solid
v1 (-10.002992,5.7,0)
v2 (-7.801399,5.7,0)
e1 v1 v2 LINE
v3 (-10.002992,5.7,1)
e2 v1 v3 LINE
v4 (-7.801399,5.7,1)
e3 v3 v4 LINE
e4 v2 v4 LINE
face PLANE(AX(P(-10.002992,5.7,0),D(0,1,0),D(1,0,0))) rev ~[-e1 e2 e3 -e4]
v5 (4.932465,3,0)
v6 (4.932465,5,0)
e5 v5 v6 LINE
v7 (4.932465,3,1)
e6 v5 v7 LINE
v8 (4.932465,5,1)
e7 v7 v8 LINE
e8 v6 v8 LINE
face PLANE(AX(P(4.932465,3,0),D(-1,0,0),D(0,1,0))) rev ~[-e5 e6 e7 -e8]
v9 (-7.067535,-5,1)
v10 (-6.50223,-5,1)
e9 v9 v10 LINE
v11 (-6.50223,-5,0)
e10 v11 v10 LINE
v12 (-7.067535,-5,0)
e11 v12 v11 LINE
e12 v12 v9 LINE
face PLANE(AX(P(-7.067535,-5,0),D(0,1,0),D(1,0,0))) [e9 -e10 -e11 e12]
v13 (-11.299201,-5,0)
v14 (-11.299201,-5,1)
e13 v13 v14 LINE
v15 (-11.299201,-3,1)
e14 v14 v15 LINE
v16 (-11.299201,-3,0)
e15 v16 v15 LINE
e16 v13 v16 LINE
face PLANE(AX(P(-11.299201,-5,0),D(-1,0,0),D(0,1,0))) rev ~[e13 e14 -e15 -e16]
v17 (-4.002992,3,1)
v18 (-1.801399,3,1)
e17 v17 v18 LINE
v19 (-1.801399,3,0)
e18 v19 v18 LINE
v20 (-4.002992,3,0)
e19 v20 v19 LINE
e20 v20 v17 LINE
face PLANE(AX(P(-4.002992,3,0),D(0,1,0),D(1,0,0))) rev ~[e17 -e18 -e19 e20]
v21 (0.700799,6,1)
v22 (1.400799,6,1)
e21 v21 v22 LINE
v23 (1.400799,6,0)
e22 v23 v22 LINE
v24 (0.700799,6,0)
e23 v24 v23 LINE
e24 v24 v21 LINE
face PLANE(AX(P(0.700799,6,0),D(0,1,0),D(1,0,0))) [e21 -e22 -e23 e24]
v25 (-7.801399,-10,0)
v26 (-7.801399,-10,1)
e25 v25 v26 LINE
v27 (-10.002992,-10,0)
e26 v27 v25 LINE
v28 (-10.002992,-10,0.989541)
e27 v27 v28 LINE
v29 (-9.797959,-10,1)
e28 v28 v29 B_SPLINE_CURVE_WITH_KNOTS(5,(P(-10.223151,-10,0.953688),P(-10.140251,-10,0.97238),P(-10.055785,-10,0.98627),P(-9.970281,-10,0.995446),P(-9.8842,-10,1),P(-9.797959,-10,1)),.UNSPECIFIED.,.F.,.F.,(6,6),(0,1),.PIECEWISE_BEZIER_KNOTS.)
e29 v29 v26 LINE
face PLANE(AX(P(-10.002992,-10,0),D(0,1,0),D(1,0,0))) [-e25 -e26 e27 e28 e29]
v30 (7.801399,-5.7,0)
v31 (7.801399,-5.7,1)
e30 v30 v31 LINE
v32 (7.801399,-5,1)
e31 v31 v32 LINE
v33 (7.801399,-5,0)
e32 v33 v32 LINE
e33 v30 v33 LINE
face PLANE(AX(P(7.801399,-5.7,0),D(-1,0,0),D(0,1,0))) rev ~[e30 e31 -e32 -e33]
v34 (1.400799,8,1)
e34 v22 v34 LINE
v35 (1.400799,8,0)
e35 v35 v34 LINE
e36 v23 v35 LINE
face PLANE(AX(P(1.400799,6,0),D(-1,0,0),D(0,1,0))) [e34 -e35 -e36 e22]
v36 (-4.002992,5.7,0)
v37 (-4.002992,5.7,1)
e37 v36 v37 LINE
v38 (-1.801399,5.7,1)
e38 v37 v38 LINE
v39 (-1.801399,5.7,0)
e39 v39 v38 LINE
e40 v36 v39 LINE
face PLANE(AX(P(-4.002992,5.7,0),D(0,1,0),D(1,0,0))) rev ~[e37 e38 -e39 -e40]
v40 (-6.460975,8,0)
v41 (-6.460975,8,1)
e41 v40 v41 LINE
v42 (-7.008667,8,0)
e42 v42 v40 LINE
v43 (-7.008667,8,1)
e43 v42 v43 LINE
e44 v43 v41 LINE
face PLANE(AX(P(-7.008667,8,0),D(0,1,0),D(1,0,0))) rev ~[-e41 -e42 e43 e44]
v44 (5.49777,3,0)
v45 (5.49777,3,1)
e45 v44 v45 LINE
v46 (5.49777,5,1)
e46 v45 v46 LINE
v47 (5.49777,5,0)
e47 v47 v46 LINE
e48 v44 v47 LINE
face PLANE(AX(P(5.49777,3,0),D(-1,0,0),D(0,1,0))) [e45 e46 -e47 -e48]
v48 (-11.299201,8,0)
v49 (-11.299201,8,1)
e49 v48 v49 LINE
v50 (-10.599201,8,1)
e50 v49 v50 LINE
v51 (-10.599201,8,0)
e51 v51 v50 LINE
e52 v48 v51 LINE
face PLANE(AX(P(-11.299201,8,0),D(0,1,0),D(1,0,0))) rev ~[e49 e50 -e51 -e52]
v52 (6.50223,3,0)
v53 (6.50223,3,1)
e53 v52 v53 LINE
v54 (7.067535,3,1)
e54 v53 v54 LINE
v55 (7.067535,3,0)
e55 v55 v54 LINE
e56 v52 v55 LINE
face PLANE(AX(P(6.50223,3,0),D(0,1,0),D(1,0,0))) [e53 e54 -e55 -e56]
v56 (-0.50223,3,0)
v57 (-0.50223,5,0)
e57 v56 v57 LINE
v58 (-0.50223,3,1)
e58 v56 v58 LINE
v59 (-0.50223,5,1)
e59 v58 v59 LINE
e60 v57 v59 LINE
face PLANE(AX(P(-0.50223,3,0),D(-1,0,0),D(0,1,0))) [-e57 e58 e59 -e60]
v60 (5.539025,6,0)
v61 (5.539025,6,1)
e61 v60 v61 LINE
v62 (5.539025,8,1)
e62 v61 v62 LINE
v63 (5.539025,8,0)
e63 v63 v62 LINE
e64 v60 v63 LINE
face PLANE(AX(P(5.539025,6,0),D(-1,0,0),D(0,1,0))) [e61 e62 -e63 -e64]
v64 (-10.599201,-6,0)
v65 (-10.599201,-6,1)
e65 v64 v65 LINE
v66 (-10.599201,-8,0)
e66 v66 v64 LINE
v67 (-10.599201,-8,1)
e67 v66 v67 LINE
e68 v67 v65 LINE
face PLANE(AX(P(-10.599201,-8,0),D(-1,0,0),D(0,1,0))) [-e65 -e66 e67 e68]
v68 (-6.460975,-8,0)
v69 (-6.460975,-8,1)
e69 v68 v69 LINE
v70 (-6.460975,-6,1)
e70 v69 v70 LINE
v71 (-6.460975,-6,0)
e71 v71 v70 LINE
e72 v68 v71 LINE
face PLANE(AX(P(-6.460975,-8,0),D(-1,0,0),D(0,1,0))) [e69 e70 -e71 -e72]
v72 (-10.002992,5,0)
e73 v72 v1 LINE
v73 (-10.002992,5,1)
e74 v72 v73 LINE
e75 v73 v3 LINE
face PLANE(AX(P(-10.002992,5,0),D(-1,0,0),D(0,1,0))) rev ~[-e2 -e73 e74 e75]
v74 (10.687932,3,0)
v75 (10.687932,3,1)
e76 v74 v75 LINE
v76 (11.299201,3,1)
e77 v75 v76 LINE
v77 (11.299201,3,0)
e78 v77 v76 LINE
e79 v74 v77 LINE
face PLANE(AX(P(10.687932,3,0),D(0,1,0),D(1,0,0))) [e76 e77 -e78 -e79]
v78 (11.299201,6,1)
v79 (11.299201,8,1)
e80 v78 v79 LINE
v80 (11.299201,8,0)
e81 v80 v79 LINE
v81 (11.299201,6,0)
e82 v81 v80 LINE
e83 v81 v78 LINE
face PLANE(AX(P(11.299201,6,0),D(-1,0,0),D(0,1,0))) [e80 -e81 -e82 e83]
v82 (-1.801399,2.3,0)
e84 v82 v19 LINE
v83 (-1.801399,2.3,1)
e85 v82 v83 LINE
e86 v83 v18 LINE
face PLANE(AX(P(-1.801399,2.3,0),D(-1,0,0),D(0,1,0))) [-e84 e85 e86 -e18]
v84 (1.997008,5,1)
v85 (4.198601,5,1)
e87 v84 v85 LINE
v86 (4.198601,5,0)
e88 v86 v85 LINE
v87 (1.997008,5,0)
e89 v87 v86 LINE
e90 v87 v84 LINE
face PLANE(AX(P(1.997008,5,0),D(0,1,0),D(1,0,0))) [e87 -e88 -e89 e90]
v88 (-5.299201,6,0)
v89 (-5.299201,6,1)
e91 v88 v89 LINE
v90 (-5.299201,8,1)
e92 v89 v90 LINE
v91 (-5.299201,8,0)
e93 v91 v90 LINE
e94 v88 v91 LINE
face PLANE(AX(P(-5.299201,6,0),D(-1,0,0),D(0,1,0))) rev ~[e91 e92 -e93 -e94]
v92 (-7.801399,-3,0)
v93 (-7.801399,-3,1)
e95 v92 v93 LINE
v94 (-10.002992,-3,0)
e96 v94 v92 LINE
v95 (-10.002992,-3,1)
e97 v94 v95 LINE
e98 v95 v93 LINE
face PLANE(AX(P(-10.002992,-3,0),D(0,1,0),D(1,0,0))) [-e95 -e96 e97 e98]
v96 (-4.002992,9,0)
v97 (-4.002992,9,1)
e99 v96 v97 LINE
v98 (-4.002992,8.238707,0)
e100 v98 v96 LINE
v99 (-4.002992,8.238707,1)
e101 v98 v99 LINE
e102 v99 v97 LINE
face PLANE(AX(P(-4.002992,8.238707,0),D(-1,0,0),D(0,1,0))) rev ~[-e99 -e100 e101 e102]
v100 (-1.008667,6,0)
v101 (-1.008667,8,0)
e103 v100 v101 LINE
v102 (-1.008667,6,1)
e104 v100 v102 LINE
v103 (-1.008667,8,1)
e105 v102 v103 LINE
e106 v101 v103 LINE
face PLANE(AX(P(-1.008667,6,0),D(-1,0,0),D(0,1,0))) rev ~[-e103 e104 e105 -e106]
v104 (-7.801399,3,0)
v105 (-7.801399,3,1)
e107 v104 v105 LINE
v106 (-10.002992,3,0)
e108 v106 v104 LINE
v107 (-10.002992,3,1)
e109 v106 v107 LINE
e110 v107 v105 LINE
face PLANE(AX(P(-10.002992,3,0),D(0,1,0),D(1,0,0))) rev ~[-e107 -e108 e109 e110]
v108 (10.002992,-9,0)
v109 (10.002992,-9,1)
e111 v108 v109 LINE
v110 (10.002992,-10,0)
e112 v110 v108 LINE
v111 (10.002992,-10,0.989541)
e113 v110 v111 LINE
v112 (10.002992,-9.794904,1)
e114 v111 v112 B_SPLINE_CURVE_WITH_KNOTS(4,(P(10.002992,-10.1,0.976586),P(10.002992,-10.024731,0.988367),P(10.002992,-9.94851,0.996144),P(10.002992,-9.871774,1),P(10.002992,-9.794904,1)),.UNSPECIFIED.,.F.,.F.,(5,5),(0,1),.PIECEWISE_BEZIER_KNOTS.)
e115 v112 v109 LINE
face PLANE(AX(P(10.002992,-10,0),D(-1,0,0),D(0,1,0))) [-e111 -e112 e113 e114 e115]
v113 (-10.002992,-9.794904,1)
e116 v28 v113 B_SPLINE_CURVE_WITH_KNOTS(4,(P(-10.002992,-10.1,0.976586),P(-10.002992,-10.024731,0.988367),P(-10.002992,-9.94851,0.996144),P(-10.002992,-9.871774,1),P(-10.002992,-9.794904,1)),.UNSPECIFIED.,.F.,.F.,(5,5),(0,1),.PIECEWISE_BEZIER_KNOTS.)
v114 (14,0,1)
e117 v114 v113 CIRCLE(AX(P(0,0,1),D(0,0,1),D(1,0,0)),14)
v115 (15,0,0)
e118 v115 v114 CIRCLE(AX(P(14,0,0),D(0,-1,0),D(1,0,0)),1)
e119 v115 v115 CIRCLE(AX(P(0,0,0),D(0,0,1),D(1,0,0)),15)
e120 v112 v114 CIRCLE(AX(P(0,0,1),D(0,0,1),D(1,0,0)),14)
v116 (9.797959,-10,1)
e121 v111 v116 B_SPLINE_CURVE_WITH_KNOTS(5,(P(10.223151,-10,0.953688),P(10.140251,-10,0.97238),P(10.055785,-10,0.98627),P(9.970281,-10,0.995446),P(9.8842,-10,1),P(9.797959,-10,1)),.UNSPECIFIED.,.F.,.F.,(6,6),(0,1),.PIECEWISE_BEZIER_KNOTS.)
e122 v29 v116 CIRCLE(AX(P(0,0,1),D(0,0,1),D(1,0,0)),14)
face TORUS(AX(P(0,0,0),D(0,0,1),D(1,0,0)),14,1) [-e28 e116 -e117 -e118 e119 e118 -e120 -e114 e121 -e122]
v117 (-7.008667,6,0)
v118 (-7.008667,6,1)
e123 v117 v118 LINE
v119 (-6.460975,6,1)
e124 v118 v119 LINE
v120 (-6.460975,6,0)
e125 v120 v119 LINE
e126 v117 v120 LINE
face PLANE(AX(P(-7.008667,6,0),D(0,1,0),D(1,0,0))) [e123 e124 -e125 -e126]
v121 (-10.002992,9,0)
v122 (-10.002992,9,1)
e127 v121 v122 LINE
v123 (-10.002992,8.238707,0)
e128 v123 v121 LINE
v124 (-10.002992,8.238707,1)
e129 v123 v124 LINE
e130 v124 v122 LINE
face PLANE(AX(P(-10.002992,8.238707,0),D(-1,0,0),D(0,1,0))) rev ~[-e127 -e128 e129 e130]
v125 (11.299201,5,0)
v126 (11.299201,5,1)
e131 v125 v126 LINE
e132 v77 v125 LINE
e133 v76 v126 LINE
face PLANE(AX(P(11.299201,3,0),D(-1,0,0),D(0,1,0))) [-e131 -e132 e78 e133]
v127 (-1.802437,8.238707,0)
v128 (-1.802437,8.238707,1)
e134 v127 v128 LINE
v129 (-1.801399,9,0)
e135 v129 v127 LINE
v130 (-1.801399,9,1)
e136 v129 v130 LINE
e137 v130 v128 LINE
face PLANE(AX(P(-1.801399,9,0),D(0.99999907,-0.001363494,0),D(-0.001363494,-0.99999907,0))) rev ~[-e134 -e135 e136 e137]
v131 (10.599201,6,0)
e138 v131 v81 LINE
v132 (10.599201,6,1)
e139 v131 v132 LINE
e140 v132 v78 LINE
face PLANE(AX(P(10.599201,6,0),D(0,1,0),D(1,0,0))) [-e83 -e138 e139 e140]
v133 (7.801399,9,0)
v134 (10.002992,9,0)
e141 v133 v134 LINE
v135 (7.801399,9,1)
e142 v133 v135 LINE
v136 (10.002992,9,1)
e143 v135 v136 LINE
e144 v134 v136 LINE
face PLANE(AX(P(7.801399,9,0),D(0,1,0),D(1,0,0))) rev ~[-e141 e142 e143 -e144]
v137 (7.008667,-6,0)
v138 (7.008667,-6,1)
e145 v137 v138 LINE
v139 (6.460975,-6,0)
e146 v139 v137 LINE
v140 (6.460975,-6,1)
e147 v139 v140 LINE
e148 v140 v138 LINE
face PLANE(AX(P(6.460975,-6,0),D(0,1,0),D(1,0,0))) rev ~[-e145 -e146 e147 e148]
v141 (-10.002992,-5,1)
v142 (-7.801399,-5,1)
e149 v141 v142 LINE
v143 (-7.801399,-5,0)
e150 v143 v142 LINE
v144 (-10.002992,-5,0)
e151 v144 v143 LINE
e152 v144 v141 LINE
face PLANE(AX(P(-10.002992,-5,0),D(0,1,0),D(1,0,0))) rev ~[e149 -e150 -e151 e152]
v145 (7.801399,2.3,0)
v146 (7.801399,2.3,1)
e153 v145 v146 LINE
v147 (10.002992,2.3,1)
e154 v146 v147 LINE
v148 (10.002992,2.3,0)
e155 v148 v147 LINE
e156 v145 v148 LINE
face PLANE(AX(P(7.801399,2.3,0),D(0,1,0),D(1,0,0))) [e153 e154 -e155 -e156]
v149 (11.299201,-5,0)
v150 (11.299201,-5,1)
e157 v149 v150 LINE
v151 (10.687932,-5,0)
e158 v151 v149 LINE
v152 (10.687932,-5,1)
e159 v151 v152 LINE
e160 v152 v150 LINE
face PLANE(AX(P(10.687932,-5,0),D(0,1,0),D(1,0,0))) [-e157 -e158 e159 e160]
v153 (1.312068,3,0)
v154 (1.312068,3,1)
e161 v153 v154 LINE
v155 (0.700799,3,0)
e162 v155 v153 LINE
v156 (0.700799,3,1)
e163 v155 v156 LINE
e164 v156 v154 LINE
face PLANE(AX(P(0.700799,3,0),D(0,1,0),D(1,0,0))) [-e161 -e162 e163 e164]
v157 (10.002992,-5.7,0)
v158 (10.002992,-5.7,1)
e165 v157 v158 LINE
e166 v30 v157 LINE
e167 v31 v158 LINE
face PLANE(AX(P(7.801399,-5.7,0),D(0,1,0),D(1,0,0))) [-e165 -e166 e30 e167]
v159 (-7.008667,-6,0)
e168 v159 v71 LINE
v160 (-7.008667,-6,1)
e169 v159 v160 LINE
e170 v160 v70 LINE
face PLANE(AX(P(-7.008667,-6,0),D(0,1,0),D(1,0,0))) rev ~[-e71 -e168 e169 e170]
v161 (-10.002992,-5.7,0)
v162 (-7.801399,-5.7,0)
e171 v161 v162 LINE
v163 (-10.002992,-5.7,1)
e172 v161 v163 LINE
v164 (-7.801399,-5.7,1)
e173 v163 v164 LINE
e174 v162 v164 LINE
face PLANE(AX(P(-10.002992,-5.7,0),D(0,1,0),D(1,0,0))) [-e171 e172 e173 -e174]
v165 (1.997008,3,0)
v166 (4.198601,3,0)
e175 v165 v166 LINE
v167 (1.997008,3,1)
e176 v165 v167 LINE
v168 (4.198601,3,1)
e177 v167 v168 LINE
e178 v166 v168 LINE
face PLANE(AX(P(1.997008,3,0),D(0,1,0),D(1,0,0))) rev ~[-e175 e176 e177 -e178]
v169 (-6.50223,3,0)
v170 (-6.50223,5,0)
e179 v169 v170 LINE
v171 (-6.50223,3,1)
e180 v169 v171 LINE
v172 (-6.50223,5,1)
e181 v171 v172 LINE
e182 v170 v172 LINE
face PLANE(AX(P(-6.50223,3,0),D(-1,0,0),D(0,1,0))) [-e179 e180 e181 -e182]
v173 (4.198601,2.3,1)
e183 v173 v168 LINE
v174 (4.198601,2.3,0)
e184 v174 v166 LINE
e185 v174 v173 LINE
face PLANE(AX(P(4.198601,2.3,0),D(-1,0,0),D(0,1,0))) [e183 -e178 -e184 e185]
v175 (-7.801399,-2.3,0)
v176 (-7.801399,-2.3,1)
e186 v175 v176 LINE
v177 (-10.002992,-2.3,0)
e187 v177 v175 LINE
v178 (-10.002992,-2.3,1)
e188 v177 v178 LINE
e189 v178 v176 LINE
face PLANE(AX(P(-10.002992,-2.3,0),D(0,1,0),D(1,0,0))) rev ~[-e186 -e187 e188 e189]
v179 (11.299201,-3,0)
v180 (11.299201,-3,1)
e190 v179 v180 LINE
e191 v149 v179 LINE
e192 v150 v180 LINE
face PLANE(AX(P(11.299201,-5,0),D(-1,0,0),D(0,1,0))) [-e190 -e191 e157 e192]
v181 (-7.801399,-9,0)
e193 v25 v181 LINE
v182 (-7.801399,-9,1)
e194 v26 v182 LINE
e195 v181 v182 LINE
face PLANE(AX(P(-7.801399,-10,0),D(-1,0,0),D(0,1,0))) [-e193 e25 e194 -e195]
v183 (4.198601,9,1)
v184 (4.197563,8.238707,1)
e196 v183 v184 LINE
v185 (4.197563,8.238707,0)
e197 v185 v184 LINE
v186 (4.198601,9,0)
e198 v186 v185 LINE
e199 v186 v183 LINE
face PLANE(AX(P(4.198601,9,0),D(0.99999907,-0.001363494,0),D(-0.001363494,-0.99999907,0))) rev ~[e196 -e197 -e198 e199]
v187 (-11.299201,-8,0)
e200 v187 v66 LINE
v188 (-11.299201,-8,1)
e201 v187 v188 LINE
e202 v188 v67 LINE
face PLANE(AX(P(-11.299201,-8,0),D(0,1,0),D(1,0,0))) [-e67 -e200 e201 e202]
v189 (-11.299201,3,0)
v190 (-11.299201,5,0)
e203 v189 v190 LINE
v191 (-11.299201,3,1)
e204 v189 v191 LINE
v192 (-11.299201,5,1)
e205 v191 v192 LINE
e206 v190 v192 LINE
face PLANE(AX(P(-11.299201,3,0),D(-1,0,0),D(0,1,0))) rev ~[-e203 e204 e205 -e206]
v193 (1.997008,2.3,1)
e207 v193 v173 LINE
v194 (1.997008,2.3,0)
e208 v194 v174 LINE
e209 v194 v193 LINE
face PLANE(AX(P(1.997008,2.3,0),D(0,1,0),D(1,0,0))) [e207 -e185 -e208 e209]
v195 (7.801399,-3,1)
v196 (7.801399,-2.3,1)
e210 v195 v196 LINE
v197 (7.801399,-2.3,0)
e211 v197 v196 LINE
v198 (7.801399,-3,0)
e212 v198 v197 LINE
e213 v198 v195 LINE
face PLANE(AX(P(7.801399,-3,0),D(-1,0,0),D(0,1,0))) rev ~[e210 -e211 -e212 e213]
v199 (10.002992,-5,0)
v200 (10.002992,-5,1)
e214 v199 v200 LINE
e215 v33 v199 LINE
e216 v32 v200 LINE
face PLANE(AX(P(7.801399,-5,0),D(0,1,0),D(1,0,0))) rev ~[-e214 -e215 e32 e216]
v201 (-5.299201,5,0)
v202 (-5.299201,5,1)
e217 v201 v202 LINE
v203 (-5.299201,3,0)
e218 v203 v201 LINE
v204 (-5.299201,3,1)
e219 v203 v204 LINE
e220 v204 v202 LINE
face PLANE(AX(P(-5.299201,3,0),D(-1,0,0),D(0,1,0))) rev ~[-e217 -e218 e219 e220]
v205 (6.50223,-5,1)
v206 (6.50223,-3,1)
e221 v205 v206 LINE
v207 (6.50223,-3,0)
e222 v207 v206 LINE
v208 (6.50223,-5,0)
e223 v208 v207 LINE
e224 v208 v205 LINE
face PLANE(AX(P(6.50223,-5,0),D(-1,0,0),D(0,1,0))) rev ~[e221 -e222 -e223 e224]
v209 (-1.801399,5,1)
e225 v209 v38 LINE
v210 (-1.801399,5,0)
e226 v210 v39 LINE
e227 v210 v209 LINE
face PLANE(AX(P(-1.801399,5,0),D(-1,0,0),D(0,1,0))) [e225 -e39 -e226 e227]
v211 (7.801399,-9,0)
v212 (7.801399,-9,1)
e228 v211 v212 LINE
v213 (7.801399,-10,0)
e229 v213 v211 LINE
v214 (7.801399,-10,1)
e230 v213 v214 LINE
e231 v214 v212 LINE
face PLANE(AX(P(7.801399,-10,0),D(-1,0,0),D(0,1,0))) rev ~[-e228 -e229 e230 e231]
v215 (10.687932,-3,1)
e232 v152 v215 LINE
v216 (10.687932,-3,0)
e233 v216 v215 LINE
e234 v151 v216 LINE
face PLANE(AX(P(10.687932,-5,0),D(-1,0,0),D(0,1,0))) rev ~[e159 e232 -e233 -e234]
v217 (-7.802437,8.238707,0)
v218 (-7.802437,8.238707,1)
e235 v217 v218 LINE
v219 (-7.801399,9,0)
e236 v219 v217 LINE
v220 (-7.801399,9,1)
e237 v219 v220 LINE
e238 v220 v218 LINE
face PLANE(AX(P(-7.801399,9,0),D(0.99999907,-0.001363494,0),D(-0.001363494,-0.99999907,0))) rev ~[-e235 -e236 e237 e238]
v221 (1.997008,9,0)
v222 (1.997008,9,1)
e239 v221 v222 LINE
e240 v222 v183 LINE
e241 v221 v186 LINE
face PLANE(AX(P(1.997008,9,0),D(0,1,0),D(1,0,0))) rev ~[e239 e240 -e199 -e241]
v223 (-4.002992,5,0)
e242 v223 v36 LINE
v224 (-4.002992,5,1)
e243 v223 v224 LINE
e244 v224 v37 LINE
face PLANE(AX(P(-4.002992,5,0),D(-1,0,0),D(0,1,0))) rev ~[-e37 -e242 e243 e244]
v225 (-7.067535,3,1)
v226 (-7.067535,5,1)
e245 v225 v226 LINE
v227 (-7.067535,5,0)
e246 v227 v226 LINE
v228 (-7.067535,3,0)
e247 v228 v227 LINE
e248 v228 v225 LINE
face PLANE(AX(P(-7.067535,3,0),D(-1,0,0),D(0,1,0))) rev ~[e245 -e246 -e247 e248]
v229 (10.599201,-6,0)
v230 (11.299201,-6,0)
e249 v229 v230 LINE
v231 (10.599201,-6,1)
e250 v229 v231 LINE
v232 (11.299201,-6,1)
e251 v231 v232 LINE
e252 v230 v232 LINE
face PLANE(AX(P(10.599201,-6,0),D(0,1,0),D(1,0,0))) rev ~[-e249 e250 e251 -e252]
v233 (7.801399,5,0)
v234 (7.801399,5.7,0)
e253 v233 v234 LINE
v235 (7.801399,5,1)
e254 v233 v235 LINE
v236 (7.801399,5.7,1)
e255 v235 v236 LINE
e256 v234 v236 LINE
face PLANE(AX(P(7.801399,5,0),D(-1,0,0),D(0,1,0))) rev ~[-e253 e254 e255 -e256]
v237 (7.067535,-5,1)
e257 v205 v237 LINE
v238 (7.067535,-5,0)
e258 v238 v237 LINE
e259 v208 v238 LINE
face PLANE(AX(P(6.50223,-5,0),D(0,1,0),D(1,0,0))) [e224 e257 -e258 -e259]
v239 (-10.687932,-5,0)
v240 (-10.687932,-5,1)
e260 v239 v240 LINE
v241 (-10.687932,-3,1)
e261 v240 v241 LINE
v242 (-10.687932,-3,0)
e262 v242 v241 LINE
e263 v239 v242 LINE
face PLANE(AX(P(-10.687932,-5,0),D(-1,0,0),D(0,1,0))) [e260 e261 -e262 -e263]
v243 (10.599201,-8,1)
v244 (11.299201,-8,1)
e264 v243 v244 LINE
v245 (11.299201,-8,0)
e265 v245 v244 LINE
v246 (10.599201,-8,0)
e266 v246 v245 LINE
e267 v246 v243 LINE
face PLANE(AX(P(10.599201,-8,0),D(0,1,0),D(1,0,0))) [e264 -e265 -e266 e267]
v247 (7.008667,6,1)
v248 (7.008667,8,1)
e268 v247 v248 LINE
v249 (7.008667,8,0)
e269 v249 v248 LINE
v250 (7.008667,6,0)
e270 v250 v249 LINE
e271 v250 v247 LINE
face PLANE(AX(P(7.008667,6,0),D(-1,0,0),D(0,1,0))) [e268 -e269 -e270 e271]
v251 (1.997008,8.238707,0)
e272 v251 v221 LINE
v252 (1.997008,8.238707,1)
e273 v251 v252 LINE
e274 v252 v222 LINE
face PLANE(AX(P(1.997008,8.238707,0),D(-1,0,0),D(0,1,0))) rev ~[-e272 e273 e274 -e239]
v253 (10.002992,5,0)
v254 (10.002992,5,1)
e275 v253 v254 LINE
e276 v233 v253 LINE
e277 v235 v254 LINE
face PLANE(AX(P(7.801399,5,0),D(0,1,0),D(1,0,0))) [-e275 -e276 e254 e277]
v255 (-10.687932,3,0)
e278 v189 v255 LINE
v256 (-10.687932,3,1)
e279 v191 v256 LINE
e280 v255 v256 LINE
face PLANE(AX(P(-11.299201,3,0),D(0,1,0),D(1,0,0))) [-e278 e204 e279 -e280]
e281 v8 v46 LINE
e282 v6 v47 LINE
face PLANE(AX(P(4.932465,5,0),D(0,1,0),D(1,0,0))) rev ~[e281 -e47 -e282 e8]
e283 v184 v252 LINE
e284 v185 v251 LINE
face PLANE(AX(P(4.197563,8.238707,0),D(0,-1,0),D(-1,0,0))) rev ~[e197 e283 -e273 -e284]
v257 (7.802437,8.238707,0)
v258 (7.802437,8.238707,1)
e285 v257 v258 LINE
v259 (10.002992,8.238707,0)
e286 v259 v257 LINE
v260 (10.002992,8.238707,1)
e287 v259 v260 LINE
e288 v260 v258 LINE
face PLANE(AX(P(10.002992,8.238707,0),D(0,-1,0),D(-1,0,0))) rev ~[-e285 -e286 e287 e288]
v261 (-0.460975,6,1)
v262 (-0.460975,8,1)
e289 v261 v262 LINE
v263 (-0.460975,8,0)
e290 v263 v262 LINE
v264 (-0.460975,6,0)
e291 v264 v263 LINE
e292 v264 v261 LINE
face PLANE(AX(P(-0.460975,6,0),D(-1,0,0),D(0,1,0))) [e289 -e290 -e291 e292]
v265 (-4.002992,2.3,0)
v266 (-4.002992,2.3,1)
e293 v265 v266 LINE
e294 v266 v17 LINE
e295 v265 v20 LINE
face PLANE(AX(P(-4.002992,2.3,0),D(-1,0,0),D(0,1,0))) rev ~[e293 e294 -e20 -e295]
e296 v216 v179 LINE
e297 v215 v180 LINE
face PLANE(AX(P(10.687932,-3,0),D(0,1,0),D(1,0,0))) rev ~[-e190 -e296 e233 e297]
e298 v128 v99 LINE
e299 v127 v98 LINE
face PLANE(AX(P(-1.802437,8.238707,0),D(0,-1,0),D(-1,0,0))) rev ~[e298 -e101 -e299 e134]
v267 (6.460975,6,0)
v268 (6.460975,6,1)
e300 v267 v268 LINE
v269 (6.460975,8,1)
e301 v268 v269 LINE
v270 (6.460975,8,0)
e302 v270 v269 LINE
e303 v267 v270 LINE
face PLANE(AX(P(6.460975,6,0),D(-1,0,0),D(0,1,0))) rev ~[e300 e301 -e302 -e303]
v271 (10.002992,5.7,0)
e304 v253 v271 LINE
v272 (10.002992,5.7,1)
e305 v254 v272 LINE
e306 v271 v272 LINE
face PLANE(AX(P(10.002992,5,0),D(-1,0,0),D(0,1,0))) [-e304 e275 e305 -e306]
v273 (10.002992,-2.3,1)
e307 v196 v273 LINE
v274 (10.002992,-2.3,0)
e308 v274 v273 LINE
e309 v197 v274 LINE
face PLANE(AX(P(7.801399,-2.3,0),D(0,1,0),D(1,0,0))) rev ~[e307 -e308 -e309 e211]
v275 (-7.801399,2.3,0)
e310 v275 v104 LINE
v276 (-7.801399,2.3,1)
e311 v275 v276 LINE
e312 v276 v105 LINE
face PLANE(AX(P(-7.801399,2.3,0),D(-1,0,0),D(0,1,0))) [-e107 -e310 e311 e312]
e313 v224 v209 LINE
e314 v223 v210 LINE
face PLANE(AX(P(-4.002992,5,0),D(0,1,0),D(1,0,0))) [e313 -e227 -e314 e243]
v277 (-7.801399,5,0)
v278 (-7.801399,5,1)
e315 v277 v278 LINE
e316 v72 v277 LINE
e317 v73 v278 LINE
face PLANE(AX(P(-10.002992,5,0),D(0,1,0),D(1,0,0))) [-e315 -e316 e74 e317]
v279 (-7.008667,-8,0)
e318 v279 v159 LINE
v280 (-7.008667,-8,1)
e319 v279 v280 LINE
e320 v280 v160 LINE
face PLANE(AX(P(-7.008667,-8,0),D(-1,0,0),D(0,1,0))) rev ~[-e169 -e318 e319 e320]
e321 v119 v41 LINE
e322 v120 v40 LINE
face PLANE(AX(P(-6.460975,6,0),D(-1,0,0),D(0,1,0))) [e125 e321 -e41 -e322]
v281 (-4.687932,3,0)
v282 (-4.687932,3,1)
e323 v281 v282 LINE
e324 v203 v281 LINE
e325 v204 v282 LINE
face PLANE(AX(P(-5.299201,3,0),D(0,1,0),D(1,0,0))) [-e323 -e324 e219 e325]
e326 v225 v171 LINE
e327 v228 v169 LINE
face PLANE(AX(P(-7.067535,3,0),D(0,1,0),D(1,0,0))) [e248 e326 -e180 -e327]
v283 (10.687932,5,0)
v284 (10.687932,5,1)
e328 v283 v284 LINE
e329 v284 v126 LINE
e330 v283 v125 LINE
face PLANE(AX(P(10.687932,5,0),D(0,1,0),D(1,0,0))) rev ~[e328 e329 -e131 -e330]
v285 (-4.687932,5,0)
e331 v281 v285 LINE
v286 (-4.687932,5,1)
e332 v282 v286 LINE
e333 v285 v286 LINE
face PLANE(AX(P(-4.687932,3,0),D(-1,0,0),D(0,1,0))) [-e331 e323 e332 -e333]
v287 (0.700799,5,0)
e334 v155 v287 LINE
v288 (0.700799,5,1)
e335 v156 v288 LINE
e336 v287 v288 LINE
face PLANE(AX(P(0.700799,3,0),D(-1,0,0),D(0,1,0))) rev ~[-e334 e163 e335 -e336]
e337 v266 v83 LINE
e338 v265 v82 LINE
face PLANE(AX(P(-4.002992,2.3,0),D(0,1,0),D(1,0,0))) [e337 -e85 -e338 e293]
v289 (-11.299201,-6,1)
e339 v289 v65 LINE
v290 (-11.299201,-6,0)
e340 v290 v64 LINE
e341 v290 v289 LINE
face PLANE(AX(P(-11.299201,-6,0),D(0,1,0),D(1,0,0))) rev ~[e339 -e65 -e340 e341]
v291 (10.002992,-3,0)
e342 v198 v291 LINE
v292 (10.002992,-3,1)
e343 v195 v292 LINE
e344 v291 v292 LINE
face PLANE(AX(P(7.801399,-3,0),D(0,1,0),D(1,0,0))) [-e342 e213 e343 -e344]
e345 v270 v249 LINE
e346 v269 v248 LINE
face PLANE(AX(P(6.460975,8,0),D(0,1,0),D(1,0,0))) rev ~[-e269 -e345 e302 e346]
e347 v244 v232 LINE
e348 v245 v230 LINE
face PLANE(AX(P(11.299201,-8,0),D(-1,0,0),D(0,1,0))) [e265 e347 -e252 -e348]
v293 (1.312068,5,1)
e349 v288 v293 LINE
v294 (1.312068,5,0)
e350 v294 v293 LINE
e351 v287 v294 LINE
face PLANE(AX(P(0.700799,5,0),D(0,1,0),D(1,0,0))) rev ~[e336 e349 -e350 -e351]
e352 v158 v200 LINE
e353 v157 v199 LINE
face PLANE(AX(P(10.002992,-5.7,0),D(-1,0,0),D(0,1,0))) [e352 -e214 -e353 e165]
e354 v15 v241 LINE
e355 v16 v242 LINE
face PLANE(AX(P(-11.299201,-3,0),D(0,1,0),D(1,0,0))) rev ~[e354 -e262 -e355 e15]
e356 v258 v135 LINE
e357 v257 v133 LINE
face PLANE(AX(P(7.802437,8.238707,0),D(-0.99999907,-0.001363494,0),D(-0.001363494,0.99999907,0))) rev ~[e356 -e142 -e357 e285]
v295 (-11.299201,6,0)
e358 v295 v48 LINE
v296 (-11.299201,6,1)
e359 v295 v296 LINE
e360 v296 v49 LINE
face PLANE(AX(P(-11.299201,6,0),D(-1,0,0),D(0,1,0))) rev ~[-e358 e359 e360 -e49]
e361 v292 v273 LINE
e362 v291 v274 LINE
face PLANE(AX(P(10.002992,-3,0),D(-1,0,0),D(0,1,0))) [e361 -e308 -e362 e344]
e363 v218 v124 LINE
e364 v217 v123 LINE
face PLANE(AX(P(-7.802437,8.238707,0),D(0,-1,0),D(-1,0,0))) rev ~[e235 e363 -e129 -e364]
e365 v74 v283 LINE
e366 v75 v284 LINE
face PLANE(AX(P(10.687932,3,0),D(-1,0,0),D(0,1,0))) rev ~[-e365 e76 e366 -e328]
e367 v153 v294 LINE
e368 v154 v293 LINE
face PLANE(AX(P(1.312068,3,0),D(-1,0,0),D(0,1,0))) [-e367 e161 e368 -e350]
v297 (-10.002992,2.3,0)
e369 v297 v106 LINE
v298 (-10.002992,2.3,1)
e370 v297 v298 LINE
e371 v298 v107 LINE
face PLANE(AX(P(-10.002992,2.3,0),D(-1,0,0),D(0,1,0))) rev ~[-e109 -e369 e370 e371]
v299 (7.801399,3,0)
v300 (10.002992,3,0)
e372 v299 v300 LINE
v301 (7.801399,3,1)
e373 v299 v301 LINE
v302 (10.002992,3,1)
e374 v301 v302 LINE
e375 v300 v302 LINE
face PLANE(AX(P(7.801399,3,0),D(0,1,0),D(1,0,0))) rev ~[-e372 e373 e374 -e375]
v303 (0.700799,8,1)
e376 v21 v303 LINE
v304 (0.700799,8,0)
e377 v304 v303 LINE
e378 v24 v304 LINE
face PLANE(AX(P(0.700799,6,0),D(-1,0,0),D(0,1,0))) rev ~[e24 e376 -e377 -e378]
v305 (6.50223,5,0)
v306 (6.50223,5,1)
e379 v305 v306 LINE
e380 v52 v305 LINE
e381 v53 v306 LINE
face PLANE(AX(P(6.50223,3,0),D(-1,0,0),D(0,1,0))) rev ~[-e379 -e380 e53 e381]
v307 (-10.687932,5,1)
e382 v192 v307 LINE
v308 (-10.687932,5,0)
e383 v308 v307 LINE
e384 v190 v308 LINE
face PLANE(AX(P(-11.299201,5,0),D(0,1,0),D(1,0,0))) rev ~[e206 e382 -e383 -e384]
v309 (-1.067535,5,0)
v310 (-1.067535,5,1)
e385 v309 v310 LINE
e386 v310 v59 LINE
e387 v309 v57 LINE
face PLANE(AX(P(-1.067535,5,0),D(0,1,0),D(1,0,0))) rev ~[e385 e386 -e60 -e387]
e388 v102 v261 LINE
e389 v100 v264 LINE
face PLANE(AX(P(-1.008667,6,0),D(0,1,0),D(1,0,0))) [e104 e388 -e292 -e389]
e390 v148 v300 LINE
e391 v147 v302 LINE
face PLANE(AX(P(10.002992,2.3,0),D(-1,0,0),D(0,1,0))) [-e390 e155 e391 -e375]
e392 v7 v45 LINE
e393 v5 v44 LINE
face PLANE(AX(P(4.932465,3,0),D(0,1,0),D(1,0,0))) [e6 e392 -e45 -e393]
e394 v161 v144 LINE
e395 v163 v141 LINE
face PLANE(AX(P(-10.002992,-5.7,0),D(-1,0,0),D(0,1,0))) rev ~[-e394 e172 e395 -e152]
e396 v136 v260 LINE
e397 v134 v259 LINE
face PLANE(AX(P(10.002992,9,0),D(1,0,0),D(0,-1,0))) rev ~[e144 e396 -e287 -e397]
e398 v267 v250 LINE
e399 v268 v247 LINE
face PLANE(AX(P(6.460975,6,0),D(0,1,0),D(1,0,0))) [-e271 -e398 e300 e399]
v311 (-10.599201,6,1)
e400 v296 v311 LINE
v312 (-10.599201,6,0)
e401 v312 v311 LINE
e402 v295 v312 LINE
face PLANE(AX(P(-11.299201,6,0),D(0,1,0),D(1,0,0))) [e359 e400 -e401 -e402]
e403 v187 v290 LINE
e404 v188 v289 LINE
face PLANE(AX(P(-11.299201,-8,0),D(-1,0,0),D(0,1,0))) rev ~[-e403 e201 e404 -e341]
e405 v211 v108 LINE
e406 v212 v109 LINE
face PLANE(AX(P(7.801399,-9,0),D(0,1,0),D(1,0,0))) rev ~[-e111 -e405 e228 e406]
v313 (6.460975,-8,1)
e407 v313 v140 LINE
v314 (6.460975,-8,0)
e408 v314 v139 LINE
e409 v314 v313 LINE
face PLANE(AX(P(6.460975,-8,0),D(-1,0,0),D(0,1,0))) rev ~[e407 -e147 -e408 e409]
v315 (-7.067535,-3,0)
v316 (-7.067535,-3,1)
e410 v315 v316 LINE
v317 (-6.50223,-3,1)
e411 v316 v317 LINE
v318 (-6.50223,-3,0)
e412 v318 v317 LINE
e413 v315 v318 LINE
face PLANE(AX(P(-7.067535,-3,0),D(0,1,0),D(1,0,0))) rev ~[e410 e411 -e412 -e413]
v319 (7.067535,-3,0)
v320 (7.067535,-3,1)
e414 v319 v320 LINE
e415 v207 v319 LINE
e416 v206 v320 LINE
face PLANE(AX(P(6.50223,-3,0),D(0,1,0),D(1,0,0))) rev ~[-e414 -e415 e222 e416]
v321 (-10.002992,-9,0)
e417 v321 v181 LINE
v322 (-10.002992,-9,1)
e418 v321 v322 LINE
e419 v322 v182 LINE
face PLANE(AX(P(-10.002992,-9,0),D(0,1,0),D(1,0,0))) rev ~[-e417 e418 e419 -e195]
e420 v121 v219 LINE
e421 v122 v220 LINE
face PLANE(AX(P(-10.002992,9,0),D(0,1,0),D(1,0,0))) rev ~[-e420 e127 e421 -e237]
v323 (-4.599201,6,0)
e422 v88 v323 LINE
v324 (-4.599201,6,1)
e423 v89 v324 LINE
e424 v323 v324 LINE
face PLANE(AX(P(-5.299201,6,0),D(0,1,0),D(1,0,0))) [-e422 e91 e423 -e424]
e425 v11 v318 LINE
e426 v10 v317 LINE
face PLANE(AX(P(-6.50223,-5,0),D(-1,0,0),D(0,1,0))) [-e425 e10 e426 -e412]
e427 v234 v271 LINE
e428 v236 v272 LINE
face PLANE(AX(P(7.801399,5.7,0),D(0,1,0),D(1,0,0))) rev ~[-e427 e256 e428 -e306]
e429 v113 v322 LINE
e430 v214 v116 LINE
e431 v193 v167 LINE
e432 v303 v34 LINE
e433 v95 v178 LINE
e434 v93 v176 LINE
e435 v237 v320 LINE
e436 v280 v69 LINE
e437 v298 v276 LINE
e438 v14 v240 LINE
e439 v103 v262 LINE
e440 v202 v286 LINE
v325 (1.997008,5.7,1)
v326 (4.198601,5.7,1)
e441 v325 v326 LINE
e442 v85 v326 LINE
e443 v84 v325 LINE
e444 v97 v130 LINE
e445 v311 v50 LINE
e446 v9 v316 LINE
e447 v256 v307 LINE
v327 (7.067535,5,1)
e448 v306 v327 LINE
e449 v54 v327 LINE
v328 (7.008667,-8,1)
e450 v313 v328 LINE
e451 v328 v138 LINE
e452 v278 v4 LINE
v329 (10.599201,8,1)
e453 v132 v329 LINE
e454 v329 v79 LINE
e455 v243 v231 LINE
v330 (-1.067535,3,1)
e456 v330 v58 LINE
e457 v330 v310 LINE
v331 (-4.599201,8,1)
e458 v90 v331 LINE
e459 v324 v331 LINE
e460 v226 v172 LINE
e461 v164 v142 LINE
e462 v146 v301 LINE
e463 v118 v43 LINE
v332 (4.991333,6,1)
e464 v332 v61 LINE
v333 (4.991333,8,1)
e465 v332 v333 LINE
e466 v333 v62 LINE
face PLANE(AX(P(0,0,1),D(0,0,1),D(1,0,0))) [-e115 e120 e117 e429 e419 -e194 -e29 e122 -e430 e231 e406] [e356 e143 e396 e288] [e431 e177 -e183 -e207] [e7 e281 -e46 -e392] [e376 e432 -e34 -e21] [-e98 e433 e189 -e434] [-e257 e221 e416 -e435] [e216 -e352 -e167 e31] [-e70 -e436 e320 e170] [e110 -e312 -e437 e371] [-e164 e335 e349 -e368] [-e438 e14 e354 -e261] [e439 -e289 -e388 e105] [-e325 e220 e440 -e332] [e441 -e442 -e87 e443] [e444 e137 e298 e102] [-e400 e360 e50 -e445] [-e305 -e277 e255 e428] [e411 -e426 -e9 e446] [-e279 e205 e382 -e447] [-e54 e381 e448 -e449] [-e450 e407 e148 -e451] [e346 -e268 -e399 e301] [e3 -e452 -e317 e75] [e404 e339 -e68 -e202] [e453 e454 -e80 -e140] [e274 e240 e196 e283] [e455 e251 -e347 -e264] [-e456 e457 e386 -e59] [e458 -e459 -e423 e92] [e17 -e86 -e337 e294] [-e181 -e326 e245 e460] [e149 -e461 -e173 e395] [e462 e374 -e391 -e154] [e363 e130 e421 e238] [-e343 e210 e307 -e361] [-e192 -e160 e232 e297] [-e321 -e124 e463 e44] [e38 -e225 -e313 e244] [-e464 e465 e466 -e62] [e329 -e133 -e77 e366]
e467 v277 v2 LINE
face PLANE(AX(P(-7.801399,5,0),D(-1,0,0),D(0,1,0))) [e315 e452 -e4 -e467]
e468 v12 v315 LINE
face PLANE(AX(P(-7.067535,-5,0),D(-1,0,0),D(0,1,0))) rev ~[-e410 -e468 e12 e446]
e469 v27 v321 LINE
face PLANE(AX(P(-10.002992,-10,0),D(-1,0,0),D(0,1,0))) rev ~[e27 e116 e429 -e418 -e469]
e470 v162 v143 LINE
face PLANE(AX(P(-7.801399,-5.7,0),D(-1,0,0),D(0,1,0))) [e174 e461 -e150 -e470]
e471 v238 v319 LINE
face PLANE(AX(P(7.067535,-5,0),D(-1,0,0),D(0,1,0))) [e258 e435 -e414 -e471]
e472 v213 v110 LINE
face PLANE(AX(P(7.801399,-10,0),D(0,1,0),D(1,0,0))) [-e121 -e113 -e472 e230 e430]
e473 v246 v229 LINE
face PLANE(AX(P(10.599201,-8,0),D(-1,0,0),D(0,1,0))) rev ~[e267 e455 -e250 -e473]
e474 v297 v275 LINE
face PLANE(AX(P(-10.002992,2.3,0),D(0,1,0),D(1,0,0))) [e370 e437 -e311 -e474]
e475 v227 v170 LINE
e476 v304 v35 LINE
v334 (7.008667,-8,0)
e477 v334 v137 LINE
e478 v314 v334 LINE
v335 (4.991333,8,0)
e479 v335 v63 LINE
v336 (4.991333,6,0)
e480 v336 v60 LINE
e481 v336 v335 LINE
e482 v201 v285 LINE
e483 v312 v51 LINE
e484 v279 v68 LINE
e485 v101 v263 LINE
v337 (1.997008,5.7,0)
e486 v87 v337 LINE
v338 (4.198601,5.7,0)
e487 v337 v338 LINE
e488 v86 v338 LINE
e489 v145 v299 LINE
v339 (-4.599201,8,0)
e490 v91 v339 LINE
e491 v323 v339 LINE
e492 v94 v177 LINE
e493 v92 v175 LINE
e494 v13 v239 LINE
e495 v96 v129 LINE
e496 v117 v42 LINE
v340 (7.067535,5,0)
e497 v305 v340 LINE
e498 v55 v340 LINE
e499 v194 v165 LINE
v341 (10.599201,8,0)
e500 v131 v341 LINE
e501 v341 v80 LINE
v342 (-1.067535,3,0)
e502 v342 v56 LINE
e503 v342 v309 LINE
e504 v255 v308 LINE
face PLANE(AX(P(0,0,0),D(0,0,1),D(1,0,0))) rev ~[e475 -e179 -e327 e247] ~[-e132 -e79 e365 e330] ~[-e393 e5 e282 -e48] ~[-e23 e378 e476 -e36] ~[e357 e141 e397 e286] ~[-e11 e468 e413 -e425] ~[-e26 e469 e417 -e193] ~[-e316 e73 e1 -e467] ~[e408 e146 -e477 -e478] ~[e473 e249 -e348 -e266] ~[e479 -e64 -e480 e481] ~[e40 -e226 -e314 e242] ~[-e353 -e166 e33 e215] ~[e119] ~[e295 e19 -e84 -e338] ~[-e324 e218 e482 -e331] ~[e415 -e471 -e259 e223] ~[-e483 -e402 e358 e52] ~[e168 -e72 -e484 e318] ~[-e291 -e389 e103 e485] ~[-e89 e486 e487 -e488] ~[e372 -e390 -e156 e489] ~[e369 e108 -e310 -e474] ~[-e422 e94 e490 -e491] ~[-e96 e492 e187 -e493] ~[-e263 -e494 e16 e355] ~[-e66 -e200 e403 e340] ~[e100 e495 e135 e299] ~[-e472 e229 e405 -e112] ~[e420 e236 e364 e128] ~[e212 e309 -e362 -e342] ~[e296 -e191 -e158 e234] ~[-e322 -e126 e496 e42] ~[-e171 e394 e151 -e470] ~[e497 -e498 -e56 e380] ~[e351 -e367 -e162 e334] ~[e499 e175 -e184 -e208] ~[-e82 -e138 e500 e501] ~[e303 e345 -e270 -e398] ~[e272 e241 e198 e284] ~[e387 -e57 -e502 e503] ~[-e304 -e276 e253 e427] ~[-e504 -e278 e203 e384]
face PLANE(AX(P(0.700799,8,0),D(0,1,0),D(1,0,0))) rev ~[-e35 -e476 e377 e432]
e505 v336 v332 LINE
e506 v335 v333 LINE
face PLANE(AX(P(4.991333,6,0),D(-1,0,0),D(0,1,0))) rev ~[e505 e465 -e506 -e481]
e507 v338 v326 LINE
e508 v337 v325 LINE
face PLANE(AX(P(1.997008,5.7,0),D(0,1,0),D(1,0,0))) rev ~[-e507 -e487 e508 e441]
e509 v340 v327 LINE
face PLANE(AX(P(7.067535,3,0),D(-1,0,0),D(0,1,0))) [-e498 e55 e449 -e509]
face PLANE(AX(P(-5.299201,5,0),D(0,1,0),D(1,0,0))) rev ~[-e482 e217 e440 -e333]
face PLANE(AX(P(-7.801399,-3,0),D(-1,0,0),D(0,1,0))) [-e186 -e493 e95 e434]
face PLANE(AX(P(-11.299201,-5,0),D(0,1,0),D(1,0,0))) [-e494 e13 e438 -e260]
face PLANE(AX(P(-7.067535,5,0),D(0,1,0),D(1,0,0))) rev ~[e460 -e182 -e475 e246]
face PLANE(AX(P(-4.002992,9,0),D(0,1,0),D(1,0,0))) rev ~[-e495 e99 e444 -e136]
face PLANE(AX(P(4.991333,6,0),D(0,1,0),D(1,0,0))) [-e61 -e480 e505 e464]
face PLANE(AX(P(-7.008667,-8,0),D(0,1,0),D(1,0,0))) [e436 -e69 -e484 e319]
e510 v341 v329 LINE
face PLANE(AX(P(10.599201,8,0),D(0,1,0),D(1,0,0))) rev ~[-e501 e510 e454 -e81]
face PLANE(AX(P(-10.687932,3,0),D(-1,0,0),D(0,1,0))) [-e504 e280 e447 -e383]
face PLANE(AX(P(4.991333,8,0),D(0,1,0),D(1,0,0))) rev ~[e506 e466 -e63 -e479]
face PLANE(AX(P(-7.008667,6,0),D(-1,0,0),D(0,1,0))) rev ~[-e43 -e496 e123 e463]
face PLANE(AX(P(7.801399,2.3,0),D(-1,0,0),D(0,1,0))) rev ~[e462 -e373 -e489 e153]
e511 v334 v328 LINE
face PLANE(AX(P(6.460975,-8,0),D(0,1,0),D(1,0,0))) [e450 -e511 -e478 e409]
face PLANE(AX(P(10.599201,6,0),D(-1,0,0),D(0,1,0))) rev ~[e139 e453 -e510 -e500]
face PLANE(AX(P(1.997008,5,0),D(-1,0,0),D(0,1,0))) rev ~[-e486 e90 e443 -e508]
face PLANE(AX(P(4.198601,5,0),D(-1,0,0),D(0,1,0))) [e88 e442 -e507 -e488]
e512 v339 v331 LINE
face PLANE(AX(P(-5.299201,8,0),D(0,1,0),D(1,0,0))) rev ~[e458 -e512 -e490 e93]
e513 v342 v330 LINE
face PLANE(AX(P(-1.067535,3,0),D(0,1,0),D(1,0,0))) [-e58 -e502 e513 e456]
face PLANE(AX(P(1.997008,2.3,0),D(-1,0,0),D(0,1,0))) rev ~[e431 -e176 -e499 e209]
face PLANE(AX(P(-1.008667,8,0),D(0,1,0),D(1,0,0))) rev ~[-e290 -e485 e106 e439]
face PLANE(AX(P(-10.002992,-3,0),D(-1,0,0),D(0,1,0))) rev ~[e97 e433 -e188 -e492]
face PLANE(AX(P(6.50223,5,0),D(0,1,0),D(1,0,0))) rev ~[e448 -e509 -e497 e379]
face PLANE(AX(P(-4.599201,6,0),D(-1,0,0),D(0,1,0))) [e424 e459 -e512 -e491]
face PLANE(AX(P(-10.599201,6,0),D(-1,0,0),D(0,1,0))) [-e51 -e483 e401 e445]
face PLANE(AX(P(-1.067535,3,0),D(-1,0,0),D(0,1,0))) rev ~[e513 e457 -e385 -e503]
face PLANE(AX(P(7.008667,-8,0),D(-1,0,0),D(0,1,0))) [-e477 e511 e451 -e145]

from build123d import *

# Parameters (mm, degrees)
F0_R     = 15
F0_W     = 2.201593481
F0_H     = 1
F0_W_2   = 0.7
F0_H_2   = 2
F0_W_3   = 0.611269173
F0_H_3   = 0.7
F0_W_4   = 0.547691976
F0_W_5   = 0.5653050612
F1_DEPTH = 1


# Not quite as in the source:
# - a fillet or chamfer that OpenCascade refuses, or shapes differently, is made with other operations: its cross-section is extruded or revolved along the edge and cut away or added
# - a feature names something its author has since deleted; it is built from what else it names


with BuildPart() as f1:
    # F0 (on Top) → F1 (new body)
    with BuildSketch(Plane.XY):
        Circle(F0_R)
        with Locations((-8.9021953754, -9.5)):
            Rectangle(F0_W, F0_H, mode=Mode.SUBTRACT)
        with Locations((-10.9492010795, -7)):
            Rectangle(F0_W_2, F0_H_2, mode=Mode.SUBTRACT)
        with Locations((-10.9935664929, -4)):
            Rectangle(F0_W_3, F0_H_2, mode=Mode.SUBTRACT)
        with Locations((-8.9021953754, -5.35)):
            Rectangle(F0_W, F0_H_3, mode=Mode.SUBTRACT)
        with Locations((-8.9021953754, -2.65)):
            Rectangle(F0_W, F0_H_3, mode=Mode.SUBTRACT)
        with Locations((-6.7348206503, -7)):
            Rectangle(F0_W_4, F0_H_2, mode=Mode.SUBTRACT)
        with Locations((-6.7848820763, -4)):
            Rectangle(F0_W_5, F0_H_2, mode=Mode.SUBTRACT)
        with Locations((8.9021953754, -9.5)):
            Rectangle(F0_W, F0_H, mode=Mode.SUBTRACT)
        with Locations((6.7348206503, -7)):
            Rectangle(F0_W_4, F0_H_2, mode=Mode.SUBTRACT)
        with Locations((6.7848820763, -4)):
            Rectangle(F0_W_5, F0_H_2, mode=Mode.SUBTRACT)
        with Locations((10.9492010795, -7)):
            Rectangle(F0_W_2, F0_H_2, mode=Mode.SUBTRACT)
        with Locations((8.9021953754, -5.35)):
            Rectangle(F0_W, F0_H_3, mode=Mode.SUBTRACT)
        with Locations((10.9935664929, -4)):
            Rectangle(F0_W_3, F0_H_2, mode=Mode.SUBTRACT)
        with Locations((8.9021953754, -2.65)):
            Rectangle(F0_W, F0_H_3, mode=Mode.SUBTRACT)
        with Locations((-8.9021953754, 2.65)):
            Rectangle(F0_W, F0_H_3, mode=Mode.SUBTRACT)
        with Locations((-10.9935664929, 4)):
            Rectangle(F0_W_3, F0_H_2, mode=Mode.SUBTRACT)
        with Locations((-8.9021953754, 5.35)):
            Rectangle(F0_W, F0_H_3, mode=Mode.SUBTRACT)
        with Locations((-10.9492010795, 7)):
            Rectangle(F0_W_2, F0_H_2, mode=Mode.SUBTRACT)
        with Locations((-2.9021953754, 2.65)):
            Rectangle(F0_W, F0_H_3, mode=Mode.SUBTRACT)
        with Locations((-6.7848820763, 4)):
            Rectangle(F0_W_5, F0_H_2, mode=Mode.SUBTRACT)
        with Locations((-4.9935664929, 4)):
            Rectangle(F0_W_3, F0_H_2, mode=Mode.SUBTRACT)
        with Locations((-6.7348206503, 7)):
            Rectangle(F0_W_4, F0_H_2, mode=Mode.SUBTRACT)
        with Locations((-4.9492010795, 7)):
            Rectangle(F0_W_2, F0_H_2, mode=Mode.SUBTRACT)
        with Locations((-2.9021953754, 5.35)):
            Rectangle(F0_W, F0_H_3, mode=Mode.SUBTRACT)
        with Locations((-0.7848820763, 4)):
            Rectangle(F0_W_5, F0_H_2, mode=Mode.SUBTRACT)
        with Locations((-0.7348206503, 7)):
            Rectangle(F0_W_4, F0_H_2, mode=Mode.SUBTRACT)
        Polygon((-10.0029921159, 9), (-7.8013986349, 9), (-7.8024366548, 8.2387067378), (-10.0029921159, 8.2387067378), align=None, mode=Mode.SUBTRACT)
        Polygon((-1.8024366548, 8.2387067378), (-4.0029921159, 8.2387067378), (-4.0029921159, 9), (-1.8013986349, 9), align=None, mode=Mode.SUBTRACT)
        with Locations((3.0978046246, 2.65)):
            Rectangle(F0_W, F0_H_3, mode=Mode.SUBTRACT)
        with Locations((1.0064335071, 4)):
            Rectangle(F0_W_3, F0_H_2, mode=Mode.SUBTRACT)
        with Locations((3.0978046246, 5.35)):
            Rectangle(F0_W, F0_H_3, mode=Mode.SUBTRACT)
        with Locations((1.0507989205, 7)):
            Rectangle(F0_W_2, F0_H_2, mode=Mode.SUBTRACT)
        with Locations((5.2151179237, 4)):
            Rectangle(F0_W_5, F0_H_2, mode=Mode.SUBTRACT)
        with Locations((6.7848820763, 4)):
            Rectangle(F0_W_5, F0_H_2, mode=Mode.SUBTRACT)
        with Locations((5.2651793497, 7)):
            Rectangle(F0_W_4, F0_H_2, mode=Mode.SUBTRACT)
        with Locations((6.7348206503, 7)):
            Rectangle(F0_W_4, F0_H_2, mode=Mode.SUBTRACT)
        with Locations((8.9021953754, 2.65)):
            Rectangle(F0_W, F0_H_3, mode=Mode.SUBTRACT)
        with Locations((8.9021953754, 5.35)):
            Rectangle(F0_W, F0_H_3, mode=Mode.SUBTRACT)
        with Locations((10.9935664929, 4)):
            Rectangle(F0_W_3, F0_H_2, mode=Mode.SUBTRACT)
        with Locations((10.9492010795, 7)):
            Rectangle(F0_W_2, F0_H_2, mode=Mode.SUBTRACT)
        Polygon((4.1975633452, 8.2387067378), (1.9970078841, 8.2387067378), (1.9970078841, 9), (4.1986013651, 9), align=None, mode=Mode.SUBTRACT)
        Polygon((10.0029921159, 9), (10.0029921159, 8.2387067378), (7.8024366548, 8.2387067378), (7.8013986349, 9), align=None, mode=Mode.SUBTRACT)
    extrude(amount=F1_DEPTH)

    # F2: fillet of radius 1 on 1 edges, made by hand

    # F2_s1 → F2_t2 (revolve, cut)
    with BuildSketch(Plane.XZ):
        with BuildLine():
            ThreePointArc((15, 0), (14.7071067812, 0.7071067812), (14, 1))
            Line((14, 1), (15, 1))
            Line((15, 1), (15, 0))
        make_face()
    revolve(axis=Axis((0, 0, 1), (0, 0, 1)), mode=Mode.SUBTRACT)


solid = f1.part
